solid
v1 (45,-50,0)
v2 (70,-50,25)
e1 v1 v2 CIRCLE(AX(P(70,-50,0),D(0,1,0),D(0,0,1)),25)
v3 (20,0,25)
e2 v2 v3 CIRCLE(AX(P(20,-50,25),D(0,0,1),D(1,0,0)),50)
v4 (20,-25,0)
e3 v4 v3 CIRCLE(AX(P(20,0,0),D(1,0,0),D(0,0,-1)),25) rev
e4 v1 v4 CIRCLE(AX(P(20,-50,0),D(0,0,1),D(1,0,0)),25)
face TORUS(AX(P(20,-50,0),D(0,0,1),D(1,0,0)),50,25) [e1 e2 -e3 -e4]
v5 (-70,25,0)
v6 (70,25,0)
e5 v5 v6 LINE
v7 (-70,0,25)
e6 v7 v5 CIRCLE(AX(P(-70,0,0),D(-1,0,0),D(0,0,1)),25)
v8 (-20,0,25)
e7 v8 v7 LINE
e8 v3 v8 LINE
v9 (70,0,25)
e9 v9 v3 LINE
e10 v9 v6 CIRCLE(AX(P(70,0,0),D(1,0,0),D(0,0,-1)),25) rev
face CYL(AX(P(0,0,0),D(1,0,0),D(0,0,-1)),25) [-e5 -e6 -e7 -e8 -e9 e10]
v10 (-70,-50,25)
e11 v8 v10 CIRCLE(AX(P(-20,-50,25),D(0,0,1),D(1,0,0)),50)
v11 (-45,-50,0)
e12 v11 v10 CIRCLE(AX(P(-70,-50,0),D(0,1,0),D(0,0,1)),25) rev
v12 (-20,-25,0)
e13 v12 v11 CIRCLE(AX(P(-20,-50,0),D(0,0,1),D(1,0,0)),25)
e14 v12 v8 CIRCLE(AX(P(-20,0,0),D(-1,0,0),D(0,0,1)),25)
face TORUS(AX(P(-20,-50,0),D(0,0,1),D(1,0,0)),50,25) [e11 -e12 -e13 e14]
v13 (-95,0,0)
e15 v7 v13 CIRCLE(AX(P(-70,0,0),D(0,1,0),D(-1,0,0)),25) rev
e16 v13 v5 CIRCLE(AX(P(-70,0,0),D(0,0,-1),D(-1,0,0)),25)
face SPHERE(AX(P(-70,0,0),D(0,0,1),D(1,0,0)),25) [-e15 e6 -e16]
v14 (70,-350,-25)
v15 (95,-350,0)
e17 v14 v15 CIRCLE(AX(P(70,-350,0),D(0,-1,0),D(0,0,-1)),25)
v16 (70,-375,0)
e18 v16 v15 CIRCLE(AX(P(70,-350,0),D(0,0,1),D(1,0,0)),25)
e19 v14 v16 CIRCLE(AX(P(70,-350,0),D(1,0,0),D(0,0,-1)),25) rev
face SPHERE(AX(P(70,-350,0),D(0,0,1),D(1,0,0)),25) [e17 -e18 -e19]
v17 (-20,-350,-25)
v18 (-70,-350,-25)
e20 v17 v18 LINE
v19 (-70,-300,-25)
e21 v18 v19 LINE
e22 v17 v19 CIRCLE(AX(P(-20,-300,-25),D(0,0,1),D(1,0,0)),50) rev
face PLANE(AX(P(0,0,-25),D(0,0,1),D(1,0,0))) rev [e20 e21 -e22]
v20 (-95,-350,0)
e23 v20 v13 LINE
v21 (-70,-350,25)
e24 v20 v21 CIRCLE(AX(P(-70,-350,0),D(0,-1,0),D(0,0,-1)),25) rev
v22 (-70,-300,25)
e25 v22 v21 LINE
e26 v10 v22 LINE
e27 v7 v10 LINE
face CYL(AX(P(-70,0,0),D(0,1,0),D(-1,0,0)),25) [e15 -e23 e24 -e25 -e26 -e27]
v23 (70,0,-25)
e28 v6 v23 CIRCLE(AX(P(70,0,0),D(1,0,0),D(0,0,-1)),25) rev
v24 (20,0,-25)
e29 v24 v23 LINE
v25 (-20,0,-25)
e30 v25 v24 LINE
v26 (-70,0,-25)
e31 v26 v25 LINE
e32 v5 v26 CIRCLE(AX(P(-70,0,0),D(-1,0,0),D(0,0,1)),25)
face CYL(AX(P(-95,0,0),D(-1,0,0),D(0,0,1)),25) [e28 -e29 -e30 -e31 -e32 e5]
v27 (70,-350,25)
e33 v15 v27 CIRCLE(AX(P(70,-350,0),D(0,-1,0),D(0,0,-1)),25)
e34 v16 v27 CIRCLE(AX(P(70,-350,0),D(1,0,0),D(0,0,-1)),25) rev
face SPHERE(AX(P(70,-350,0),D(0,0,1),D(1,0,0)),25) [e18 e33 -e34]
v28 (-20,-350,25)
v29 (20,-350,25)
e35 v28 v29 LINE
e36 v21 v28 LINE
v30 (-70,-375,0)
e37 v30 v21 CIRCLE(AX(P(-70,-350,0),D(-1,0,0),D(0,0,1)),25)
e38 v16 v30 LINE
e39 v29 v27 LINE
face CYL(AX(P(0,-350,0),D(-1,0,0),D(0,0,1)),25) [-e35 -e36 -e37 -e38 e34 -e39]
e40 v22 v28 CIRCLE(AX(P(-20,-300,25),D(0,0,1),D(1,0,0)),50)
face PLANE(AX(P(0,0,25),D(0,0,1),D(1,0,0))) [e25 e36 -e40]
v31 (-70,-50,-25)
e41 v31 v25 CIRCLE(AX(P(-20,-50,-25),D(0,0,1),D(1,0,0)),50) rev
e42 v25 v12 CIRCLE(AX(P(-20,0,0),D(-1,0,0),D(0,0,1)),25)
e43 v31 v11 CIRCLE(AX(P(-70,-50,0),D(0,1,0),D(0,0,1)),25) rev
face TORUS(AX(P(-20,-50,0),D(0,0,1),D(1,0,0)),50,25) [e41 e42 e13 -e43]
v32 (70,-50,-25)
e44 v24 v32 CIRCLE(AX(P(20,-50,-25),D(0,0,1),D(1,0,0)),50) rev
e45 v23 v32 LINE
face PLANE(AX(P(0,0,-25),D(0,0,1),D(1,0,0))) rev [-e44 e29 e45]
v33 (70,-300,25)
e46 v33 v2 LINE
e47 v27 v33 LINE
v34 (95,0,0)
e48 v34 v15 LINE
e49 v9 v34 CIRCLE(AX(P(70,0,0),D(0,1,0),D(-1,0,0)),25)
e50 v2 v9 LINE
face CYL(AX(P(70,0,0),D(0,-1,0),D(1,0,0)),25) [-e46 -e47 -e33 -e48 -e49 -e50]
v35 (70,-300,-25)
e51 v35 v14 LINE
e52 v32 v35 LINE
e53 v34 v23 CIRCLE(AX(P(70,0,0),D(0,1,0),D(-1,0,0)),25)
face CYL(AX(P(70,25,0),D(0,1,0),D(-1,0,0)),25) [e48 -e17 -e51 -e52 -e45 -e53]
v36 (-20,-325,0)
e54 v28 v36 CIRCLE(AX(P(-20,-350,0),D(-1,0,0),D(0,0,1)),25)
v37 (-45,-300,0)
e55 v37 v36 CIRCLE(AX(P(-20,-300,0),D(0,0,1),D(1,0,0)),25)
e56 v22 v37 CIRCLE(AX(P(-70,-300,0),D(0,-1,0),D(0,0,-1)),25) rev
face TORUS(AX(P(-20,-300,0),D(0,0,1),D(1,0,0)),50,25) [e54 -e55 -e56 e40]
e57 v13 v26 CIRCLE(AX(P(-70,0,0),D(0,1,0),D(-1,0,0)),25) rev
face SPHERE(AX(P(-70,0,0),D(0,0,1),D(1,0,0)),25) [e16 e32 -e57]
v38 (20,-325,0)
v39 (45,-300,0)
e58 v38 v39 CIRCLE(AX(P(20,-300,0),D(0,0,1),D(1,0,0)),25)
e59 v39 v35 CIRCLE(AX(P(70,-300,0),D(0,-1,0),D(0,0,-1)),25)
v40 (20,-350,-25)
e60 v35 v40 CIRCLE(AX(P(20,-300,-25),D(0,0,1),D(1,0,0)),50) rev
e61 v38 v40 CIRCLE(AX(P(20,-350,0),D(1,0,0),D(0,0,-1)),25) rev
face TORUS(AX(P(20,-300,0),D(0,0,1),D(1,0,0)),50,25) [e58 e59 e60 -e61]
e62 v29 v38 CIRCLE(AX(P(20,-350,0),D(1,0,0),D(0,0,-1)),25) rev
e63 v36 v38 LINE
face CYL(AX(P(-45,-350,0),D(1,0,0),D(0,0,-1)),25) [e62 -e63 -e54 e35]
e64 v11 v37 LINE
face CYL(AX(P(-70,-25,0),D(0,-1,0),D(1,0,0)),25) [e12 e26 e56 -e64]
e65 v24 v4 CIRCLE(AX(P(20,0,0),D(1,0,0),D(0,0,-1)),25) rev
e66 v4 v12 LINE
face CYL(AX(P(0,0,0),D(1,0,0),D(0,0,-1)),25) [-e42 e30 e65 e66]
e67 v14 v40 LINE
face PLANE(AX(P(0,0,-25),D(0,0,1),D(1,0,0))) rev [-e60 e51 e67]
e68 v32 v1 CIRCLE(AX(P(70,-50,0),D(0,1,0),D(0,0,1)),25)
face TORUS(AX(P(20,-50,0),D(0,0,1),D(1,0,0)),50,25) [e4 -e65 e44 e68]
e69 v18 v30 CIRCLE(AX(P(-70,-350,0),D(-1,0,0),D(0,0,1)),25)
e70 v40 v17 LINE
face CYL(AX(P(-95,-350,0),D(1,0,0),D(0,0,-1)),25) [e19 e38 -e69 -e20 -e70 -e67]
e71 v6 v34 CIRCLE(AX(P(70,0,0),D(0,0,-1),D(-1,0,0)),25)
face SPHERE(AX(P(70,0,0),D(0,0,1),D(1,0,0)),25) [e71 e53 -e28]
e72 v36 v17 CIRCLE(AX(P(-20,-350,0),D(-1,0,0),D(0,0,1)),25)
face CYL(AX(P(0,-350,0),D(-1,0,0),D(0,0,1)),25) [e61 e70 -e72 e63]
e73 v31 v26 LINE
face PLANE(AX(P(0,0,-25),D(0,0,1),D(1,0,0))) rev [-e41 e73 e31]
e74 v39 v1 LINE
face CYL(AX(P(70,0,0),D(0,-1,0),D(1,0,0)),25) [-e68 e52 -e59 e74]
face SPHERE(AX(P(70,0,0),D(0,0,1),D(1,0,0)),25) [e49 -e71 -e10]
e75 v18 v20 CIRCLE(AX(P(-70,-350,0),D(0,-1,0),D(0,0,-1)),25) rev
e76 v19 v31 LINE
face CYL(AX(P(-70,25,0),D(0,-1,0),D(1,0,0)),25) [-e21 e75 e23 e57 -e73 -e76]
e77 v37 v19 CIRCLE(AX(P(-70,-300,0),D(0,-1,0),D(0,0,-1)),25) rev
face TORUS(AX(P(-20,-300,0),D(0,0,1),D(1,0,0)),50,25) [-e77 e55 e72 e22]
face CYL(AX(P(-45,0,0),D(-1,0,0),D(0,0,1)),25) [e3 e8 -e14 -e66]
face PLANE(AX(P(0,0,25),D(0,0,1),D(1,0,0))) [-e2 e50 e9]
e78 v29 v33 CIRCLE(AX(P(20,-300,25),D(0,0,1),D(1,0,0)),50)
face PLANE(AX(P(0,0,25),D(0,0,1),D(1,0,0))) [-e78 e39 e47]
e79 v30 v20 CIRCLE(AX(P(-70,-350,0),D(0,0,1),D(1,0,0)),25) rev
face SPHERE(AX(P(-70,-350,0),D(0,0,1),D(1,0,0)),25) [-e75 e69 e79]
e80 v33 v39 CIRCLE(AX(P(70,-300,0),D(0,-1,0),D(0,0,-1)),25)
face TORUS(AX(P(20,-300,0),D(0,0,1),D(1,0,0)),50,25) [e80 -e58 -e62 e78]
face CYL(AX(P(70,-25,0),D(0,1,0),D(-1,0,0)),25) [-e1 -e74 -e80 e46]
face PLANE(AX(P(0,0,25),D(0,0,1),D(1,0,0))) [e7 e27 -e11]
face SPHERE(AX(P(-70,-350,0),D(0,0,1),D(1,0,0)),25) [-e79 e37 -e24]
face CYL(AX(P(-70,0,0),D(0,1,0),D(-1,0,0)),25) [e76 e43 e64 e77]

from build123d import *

# Parameters (mm, degrees)
SKETCH1_W           = 190
SKETCH1_H           = 400
SKETCH1_W_2         = 90
SKETCH1_H_2         = 300
BOSS_EXTRUDE1_DEPTH = 25
FILLET1_R           = 25


with BuildPart() as part:
    # Sketch1 → Boss-Extrude1 (new, symmetric)
    with BuildSketch(Plane.XY):
        with Locations((0, -175)):
            Rectangle(SKETCH1_W, SKETCH1_H)
        with Locations((0, -175)):
            Rectangle(SKETCH1_W_2, SKETCH1_H_2, mode=Mode.SUBTRACT)
    extrude(amount=BOSS_EXTRUDE1_DEPTH, both=True)

    # Fillet1
    fillet1_edges = [part.edges().sort_by_distance(p)[0] for p in [
        (95, -175, 25),
        (0, 25, 25),
        (-45, -175, -25),
        (-45, -25, 0),
        (0, -325, -25),
        (-45, -325, 0),
        (45, -175, -25),
        (45, -325, 0),
        (0, -25, -25),
        (45, -25, 0),
        (-45, -175, 25),
        (0, -325, 25),
        (45, -175, 25),
        (0, -25, 25),
        (-95, -175, 25),
        (0, 25, -25),
        (95, -175, -25),
        (0, -375, -25),
        (-95, -175, -25),
        (0, -375, 25),
        (-95, 25, 0),
        (95, 25, 0),
        (95, -375, 0),
        (-95, -375, 0),
    ]]
    fillet(fillet1_edges, radius=FILLET1_R - 0.0001)  # a hair under: the kernel refuses the full size


solid = part.part
